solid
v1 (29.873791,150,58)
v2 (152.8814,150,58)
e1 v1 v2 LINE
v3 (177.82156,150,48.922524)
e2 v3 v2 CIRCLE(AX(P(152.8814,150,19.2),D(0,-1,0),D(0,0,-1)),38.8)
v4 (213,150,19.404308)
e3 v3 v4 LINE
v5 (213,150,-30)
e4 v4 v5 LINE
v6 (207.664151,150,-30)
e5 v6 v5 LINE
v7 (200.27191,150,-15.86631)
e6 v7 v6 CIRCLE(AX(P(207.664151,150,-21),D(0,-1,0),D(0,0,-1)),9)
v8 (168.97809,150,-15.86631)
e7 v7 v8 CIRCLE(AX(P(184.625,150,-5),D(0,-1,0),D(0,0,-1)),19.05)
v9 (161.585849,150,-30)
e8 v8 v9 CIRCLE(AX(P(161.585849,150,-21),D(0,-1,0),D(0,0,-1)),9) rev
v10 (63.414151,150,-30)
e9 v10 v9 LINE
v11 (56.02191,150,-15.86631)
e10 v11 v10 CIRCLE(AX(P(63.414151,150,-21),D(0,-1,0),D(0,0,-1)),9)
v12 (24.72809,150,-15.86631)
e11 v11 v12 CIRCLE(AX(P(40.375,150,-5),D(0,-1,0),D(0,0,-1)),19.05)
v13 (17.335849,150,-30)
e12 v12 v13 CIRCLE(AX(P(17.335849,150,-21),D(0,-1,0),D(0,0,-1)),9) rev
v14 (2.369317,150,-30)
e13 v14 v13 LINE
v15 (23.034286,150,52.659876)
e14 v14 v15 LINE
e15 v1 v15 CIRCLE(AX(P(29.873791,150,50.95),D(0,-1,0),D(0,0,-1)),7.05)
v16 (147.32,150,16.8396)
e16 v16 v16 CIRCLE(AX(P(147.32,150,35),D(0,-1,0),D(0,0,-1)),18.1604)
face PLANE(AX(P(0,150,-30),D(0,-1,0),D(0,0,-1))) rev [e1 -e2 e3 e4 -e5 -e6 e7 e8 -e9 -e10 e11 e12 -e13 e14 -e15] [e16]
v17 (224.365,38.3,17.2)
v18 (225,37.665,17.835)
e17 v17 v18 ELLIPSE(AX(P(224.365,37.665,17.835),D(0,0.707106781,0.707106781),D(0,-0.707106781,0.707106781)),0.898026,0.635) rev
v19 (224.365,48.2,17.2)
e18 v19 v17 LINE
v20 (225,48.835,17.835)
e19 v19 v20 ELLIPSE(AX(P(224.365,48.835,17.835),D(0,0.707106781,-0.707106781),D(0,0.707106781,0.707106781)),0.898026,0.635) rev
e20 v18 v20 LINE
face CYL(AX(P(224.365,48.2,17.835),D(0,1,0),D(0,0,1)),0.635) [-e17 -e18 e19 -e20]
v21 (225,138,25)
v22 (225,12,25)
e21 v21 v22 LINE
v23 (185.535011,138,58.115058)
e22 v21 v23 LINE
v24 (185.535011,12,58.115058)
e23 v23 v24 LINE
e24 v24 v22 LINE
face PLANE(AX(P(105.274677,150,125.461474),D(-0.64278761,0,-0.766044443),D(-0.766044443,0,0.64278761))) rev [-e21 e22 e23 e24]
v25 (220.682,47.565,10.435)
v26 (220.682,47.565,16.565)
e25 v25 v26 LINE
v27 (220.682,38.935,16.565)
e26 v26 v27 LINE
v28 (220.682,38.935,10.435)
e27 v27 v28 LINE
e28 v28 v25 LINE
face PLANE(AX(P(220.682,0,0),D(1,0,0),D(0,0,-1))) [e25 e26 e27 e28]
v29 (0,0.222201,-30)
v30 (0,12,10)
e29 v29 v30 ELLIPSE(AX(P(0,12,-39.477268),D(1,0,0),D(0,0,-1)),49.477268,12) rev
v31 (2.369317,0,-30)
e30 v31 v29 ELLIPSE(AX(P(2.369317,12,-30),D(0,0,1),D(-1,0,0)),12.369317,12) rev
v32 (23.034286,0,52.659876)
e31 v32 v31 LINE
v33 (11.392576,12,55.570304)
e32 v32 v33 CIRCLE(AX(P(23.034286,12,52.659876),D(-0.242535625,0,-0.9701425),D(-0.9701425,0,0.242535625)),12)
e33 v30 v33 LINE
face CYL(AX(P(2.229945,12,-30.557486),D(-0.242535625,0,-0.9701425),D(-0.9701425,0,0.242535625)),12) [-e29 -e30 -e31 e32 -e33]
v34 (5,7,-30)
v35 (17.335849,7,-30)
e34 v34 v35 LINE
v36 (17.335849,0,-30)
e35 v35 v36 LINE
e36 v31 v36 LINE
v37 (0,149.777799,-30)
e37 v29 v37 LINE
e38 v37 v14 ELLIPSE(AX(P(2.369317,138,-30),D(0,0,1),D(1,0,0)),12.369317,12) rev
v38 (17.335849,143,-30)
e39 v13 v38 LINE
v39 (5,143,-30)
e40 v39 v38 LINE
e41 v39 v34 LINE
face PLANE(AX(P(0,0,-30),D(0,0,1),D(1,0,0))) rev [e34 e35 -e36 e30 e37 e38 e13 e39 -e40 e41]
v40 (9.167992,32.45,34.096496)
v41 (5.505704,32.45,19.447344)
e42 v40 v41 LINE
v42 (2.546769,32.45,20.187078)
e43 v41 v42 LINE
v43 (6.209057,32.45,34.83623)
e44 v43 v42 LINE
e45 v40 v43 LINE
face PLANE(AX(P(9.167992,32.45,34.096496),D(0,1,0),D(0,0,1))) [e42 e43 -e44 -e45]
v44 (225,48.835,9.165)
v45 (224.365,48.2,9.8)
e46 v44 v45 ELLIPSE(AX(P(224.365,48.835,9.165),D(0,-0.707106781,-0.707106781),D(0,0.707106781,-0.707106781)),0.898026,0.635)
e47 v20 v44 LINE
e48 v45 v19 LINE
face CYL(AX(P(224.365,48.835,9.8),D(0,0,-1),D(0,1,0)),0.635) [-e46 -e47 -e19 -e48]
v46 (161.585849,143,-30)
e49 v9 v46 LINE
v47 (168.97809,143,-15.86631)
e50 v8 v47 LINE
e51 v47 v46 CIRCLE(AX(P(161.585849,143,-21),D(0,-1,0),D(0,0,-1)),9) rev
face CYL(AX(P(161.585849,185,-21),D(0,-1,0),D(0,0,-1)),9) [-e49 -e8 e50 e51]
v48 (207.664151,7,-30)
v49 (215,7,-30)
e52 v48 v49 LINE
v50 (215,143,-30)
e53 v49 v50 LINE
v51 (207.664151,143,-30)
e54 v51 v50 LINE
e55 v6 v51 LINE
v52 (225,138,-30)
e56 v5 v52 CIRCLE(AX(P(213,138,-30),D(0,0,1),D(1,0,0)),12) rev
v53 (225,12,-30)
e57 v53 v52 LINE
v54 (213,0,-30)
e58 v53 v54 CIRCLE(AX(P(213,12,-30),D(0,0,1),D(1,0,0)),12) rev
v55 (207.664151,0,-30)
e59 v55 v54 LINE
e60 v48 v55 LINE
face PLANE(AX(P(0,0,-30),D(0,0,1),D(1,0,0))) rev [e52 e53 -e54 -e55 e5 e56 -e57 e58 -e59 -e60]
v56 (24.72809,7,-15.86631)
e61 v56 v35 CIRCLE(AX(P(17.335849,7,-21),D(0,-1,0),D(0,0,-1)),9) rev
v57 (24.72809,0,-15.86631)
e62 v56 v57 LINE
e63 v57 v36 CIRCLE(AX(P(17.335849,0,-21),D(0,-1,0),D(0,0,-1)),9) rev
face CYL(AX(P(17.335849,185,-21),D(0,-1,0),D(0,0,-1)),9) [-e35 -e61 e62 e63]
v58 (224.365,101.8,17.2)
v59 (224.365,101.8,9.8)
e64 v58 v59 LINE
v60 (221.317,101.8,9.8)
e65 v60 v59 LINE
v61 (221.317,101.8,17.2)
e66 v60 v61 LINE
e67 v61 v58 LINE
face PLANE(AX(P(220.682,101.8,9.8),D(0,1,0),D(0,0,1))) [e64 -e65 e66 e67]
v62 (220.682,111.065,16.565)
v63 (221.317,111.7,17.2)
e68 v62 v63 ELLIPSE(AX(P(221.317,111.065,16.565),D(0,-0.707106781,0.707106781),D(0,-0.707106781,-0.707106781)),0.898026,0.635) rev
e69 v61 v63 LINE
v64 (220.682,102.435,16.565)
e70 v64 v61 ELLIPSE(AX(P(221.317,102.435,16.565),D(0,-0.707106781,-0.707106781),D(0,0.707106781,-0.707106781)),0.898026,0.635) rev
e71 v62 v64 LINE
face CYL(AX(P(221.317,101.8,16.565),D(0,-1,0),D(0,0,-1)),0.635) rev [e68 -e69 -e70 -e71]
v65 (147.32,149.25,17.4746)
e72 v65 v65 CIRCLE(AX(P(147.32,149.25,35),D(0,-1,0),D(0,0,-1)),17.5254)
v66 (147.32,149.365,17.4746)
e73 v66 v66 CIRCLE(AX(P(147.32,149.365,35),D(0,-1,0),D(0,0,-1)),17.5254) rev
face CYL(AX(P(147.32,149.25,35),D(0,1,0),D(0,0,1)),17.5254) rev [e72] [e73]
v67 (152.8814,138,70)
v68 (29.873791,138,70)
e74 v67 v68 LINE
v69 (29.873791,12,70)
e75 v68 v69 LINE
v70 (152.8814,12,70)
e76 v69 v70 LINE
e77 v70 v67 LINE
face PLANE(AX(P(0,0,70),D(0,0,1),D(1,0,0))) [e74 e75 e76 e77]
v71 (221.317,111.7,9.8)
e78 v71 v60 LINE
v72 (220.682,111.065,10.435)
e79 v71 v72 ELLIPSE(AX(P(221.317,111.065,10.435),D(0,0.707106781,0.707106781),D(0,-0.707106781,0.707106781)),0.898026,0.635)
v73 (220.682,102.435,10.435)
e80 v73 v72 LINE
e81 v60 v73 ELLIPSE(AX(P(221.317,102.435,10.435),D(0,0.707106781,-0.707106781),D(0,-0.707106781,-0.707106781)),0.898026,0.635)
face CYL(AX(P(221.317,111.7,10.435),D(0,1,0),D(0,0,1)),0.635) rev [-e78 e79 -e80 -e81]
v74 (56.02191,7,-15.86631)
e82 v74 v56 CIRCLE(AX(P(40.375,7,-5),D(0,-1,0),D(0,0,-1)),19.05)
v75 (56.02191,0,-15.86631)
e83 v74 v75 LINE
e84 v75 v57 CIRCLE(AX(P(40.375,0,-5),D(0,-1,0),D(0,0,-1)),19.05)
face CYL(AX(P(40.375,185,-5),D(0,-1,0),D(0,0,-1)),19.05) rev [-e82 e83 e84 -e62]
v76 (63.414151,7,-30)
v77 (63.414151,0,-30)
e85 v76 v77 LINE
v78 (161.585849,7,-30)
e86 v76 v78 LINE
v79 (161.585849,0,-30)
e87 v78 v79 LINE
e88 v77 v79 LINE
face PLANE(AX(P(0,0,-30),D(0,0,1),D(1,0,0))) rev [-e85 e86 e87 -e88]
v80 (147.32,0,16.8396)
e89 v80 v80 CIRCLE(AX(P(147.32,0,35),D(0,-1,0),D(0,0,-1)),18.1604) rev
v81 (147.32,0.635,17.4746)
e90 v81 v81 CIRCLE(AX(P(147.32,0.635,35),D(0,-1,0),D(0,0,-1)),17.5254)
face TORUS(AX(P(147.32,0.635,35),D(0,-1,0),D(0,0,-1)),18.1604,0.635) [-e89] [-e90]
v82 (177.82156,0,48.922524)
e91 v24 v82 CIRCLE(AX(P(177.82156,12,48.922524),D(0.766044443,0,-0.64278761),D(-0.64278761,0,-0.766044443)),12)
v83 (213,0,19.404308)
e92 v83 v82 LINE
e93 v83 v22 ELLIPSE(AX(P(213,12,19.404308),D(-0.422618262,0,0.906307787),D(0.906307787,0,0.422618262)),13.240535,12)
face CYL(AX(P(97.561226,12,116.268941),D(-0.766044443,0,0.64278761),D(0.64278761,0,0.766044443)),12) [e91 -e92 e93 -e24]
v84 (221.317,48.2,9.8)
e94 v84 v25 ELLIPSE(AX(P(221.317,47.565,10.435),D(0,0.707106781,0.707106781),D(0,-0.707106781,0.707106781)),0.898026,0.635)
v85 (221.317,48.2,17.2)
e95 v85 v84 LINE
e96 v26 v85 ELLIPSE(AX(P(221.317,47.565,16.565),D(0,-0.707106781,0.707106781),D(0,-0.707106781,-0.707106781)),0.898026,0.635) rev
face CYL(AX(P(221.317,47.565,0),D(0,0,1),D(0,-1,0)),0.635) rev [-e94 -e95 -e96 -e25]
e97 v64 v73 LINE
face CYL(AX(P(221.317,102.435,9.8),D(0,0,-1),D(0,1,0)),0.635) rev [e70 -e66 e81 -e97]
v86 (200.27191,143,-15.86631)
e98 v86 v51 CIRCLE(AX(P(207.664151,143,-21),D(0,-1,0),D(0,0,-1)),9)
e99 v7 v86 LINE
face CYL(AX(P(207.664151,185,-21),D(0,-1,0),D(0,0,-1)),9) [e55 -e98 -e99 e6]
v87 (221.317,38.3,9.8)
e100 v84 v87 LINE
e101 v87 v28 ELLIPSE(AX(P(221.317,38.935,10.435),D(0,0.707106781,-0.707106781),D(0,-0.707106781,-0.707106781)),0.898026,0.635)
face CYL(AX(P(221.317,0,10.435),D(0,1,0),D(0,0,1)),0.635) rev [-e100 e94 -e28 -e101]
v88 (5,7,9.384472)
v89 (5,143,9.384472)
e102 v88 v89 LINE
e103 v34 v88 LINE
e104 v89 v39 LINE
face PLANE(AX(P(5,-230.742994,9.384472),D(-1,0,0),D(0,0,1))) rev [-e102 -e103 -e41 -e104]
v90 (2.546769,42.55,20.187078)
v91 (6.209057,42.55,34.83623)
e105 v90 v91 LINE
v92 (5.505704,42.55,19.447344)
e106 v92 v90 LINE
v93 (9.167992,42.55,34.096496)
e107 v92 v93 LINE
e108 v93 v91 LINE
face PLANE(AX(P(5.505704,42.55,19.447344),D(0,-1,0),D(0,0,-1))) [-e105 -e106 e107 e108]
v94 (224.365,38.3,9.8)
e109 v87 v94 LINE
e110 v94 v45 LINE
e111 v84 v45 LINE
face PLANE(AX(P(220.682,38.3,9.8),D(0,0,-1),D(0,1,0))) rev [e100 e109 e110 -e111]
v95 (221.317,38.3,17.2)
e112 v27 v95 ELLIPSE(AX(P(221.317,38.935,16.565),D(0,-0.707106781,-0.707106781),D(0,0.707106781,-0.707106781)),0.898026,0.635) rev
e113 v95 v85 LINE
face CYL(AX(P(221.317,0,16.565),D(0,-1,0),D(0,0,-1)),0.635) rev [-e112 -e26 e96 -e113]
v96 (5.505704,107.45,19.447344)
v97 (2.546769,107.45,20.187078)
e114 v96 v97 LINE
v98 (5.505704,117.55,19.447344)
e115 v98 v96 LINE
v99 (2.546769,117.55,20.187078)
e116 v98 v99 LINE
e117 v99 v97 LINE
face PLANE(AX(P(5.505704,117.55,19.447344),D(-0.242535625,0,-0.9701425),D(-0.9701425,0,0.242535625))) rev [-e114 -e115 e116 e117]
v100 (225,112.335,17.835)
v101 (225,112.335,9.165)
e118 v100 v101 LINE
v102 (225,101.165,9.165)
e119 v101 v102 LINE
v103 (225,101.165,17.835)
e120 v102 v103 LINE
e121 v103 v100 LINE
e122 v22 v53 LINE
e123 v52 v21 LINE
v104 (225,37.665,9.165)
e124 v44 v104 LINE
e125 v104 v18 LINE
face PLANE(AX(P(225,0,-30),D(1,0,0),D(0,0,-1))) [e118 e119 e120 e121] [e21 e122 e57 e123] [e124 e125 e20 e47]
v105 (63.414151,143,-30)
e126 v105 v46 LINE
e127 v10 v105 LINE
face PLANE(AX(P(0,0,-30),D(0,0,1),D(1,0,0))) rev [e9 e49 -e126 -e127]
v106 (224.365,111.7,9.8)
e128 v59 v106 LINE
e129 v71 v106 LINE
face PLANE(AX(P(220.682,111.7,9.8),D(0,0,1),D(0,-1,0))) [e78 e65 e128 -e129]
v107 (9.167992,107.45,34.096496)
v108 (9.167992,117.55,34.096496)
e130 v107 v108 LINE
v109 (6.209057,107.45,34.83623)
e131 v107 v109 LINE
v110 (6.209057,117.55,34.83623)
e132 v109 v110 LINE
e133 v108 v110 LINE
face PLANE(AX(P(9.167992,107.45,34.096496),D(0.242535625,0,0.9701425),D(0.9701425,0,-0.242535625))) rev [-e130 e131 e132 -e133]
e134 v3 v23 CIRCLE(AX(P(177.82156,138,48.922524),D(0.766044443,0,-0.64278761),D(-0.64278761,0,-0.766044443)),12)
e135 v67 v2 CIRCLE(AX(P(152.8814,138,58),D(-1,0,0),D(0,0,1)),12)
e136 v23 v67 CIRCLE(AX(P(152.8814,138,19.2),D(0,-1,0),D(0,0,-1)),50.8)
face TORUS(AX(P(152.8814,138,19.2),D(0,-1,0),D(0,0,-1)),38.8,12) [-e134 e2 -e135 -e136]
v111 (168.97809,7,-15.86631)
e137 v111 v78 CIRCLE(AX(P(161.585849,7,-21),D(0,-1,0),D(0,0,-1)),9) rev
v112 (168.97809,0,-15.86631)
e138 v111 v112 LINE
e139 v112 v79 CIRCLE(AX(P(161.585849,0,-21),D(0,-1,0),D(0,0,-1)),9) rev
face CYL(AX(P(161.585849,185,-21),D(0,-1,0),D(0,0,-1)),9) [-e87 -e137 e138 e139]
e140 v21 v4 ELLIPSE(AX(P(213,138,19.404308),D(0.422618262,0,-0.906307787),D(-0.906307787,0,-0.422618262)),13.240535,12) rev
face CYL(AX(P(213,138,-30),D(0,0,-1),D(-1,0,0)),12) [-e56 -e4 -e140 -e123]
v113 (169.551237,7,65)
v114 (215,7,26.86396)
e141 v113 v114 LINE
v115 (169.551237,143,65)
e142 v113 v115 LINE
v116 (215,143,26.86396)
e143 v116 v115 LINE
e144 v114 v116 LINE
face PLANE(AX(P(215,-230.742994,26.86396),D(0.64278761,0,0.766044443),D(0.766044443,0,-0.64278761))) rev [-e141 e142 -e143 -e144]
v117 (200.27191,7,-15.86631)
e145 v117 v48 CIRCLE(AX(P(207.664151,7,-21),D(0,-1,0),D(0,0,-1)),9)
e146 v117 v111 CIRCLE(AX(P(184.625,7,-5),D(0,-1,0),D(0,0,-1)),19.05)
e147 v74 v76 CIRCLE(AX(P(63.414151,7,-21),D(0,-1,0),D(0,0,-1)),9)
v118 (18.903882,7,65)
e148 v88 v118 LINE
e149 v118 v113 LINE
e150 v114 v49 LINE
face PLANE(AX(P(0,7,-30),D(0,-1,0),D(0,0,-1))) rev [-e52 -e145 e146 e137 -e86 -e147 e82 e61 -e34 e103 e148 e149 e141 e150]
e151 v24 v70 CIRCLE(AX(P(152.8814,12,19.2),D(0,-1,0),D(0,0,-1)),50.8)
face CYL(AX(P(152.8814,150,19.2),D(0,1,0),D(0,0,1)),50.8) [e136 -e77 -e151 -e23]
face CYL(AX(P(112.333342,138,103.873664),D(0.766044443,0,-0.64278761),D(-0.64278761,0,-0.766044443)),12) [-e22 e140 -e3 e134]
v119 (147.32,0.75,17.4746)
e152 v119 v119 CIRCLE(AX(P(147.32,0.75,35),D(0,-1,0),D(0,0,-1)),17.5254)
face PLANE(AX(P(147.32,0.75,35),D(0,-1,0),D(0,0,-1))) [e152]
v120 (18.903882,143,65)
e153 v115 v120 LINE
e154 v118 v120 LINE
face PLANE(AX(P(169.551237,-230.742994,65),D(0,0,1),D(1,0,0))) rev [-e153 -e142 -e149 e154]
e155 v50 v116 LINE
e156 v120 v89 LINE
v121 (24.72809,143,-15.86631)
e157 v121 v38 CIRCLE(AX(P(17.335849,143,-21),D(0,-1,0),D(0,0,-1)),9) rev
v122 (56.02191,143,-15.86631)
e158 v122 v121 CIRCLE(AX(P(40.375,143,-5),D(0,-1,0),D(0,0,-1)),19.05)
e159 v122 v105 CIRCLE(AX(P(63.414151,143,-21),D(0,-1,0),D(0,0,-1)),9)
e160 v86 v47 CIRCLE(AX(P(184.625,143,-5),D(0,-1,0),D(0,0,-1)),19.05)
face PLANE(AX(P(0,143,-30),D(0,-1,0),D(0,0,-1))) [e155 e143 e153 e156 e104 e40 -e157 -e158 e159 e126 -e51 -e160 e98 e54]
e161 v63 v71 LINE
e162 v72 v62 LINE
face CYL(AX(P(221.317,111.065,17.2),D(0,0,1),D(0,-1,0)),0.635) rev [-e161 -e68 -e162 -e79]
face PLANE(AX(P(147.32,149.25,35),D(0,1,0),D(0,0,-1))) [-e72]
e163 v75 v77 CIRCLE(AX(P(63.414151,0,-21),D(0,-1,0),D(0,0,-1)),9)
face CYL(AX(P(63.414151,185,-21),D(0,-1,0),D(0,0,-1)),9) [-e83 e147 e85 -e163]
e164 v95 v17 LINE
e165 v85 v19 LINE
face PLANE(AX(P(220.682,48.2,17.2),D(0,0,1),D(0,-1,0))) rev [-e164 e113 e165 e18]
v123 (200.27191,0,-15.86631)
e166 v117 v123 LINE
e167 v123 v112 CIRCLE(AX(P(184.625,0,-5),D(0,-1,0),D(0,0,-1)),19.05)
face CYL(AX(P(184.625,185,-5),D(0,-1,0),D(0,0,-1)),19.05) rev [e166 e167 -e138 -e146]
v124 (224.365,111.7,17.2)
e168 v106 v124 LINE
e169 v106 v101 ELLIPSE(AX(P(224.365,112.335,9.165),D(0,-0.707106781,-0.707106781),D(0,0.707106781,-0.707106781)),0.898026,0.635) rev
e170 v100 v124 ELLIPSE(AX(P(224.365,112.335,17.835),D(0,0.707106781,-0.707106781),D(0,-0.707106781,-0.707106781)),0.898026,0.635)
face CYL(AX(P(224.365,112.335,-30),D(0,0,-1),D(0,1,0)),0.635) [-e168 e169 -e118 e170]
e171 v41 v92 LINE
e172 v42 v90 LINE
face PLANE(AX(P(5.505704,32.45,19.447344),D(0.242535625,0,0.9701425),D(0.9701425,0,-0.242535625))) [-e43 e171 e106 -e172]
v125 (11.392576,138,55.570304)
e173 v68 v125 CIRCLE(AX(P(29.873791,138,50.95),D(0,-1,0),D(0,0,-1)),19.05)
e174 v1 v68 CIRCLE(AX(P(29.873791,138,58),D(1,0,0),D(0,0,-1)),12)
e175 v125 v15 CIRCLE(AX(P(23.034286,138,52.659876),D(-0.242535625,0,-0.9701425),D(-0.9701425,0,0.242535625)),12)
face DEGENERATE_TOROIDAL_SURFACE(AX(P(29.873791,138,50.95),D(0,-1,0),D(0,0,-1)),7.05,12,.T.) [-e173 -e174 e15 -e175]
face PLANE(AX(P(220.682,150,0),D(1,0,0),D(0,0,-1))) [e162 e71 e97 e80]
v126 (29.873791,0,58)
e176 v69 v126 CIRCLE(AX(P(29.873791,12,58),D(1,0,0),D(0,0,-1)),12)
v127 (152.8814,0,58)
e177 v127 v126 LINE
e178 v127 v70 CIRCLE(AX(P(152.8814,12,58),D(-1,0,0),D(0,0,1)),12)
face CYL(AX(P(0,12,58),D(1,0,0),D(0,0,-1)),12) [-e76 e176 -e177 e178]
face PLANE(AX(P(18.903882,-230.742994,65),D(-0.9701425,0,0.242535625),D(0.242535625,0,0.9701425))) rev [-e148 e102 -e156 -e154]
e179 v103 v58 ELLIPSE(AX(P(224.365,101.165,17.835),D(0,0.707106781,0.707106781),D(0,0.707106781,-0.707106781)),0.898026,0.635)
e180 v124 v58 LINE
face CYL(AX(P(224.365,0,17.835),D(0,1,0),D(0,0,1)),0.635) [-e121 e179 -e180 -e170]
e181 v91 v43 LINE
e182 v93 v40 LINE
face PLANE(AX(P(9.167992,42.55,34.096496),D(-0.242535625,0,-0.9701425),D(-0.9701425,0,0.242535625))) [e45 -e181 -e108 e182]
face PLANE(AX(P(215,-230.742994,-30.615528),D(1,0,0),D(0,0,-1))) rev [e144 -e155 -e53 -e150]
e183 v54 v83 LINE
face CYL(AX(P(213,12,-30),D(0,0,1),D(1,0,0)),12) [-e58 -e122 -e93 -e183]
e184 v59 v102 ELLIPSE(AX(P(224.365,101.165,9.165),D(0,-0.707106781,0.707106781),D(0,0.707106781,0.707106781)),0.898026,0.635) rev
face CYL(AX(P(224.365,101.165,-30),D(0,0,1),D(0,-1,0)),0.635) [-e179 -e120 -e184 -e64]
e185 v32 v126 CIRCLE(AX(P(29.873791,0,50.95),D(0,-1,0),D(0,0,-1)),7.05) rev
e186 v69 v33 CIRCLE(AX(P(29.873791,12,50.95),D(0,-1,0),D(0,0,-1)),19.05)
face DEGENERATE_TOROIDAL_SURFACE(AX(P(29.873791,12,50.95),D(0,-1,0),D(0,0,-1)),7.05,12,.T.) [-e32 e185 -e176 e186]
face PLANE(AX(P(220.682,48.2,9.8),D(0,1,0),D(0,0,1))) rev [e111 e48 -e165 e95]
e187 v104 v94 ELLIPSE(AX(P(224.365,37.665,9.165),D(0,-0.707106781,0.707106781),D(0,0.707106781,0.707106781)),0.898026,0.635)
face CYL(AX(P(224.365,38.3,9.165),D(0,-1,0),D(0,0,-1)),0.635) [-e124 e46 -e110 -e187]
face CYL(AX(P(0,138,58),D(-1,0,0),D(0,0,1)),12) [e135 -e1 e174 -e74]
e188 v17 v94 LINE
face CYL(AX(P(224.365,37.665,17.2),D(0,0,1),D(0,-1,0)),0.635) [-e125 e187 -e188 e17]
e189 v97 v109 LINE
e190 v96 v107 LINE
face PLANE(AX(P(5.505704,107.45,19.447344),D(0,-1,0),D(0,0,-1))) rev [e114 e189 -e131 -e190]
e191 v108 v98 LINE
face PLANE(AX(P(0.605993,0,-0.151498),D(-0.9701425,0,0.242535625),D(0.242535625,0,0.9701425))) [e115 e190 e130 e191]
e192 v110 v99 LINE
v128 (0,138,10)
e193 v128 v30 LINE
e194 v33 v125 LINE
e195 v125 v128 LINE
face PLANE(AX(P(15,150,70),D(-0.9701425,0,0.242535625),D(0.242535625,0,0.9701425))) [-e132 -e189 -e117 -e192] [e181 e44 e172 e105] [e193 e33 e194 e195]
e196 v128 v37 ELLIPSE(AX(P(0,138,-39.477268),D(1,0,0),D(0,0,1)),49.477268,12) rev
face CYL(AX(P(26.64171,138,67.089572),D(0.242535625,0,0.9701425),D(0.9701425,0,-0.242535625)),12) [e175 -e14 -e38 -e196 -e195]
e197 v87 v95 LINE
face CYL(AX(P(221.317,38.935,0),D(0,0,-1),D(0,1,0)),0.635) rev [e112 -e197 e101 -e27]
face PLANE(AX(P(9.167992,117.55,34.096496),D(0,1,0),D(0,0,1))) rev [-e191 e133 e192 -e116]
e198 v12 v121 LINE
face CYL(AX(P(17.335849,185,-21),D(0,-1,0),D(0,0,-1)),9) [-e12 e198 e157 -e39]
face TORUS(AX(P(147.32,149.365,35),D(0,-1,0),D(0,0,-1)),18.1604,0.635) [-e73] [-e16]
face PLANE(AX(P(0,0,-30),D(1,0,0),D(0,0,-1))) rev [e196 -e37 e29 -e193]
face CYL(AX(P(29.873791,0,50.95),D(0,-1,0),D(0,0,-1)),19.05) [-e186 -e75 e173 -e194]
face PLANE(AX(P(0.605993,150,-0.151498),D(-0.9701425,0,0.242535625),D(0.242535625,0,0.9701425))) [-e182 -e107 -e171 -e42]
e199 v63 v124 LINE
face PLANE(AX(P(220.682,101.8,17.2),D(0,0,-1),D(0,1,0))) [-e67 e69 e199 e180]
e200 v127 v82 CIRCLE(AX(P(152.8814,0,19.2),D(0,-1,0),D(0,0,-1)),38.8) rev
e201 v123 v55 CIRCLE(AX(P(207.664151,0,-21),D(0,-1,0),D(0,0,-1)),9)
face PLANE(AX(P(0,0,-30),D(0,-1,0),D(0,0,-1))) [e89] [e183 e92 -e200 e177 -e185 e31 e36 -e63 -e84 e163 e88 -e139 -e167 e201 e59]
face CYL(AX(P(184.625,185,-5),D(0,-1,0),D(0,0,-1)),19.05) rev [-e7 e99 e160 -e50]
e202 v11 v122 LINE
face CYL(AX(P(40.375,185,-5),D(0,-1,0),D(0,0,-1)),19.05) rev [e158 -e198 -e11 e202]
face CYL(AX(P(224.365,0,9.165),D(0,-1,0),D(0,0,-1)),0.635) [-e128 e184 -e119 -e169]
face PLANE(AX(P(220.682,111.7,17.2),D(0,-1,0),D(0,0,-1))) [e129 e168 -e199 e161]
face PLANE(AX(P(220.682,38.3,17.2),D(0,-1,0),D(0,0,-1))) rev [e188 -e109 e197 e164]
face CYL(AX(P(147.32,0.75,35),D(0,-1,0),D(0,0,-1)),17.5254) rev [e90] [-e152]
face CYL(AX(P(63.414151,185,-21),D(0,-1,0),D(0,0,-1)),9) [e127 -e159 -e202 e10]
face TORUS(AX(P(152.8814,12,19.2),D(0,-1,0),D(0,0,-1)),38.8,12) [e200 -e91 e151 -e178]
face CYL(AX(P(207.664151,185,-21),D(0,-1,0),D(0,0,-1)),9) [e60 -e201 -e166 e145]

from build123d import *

# Parameters (mm, degrees)
BOSS_EXTRUDE1_DEPTH      = 70
BOSS_EXTRUDE1_DEPTH_BACK = 30
SKETCH1_W                = 225
SKETCH1_H                = 150
CUT_EXTRUDE1_DEPTH       = 280.329554469
CUT_EXTRUDE2_DEPTH       = 68
CUT_EXTRUDE2_DEPTH_BACK  = 68
SKETCH8_R                = 19.05
CUT_EXTRUDE3_DEPTH       = 185
FILLET1_R                = 12
FILLET2_R                = 50.8
FILLET3_R                = 19.05
SKETCH13_W               = 7.4
SKETCH13_H               = 9.9
CUT_EXTRUDE4_DEPTH       = 4.318
FILLET4_R                = 0.635
FILLET4_OF_MIRROR2_R     = 0.635
SKETCH14_R               = 17.5254
CUT_EXTRUDE5_DEPTH       = 0.75
FILLET5_R                = 0.635
FILLET6_R                = 0.635
SKETCH16_W               = 15.1
SKETCH16_H               = 10.1
CUT_EXTRUDE6_DEPTH       = 3.05


with BuildPart() as part:
    # Sketch1 → Boss-Extrude1 (new, two sides: drawn at the far end of the back side and taken through both)
    with BuildSketch(Plane.XY.offset(-BOSS_EXTRUDE1_DEPTH_BACK)):
        with Locations((112.5, 75)):
            Rectangle(SKETCH1_W, SKETCH1_H)
    extrude(amount=BOSS_EXTRUDE1_DEPTH + BOSS_EXTRUDE1_DEPTH_BACK)

    # Sketch2 → Cut-Extrude1 (cut, through all)
    with BuildSketch(Plane.XZ):
        Polygon((225, 70), (171.371088333, 70), (225, 25), align=None)
        Polygon((0, 70), (15, 70), (0, 10), align=None)
    extrude(amount=-CUT_EXTRUDE1_DEPTH, mode=Mode.SUBTRACT)

    # Sketch7 → Cut-Extrude2 (cut, two sides: drawn at the far end of the back side and taken through both)
    with BuildSketch(Plane(origin=(0, 75, 0), x_dir=(1, 0, 0), z_dir=(0, 1, 0)).offset(-CUT_EXTRUDE2_DEPTH_BACK)):
        Polygon((215, 30.615528128), (215, -26.863959865), (169.551237162, -65), (18.903882032, -65), (5, -9.384471872), (5, 30.615528128), align=None)
    extrude(amount=CUT_EXTRUDE2_DEPTH + CUT_EXTRUDE2_DEPTH_BACK, mode=Mode.SUBTRACT)

    # Sketch8 → Cut-Extrude3 (cut)
    with BuildSketch(Plane.XZ):
        with Locations((40.375, -5)):
            Circle(SKETCH8_R)
        with BuildLine():
            Line((17.33584854, -30), (63.41415146, -30))
            ThreePointArc((63.41415146, -30), (55.439090064, -25.17113842), (56.02191035, -15.86631016))
            ThreePointArc((56.02191035, -15.86631016), (40.375, -24.05), (24.72808965, -15.86631016))
            ThreePointArc((24.72808965, -15.86631016), (25.310909936, -25.17113842), (17.33584854, -30))
        make_face()
        with Locations((184.625, -5)):
            Circle(SKETCH8_R)
        with BuildLine():
            ThreePointArc((200.27191035, -15.86631016), (184.625, -24.05), (168.97808965, -15.86631016))
            ThreePointArc((168.97808965, -15.86631016), (169.560909936, -25.17113842), (161.58584854, -30))
            Line((161.58584854, -30), (207.66415146, -30))
            ThreePointArc((207.66415146, -30), (199.689090064, -25.17113842), (200.27191035, -15.86631016))
        make_face()
    extrude(amount=-CUT_EXTRUDE3_DEPTH, mode=Mode.SUBTRACT)

    # Fillet1
    fillet1_edges = [part.edges().sort_by_distance(p)[0] for p in [
        (198.185544167, 0, 47.5),
        (225, 0, -2.5),
        (7.5, 0, 40),
        (93.185544167, 0, 70),
        (7.5, 150, 40),
        (93.185544167, 150, 70),
        (198.185544167, 150, 47.5),
        (225, 150, -2.5),
    ]]
    fillet(fillet1_edges, radius=FILLET1_R)

    # Fillet2
    # the kernel refuses this fillet: 50.8 mm, written as the material it takes off along each edge
    with BuildSketch(Plane(origin=(152.881400433, 150, 19.2), x_dir=(0, 0, 1), z_dir=(-1, 0, 0))) as fillet2_piece_1:
        with BuildLine():
            CenterArc((38.8, -12), 12, 0, 90)
            Line((50.8, -12), (50.8, 0))
            Line((50.8, 0), (38.8, 0))
        make_face()
    revolve(axis=Axis((152.881400433, 150, 19.2), (0, 1, 0)), revolution_arc=40, mode=Mode.SUBTRACT)
    with BuildSketch(Plane(origin=(152.881400433, 0, 19.2), x_dir=(0.6427876096865435, 0, 0.7660444431189747), z_dir=(0.7660444431189747, 0, -0.6427876096865435))) as fillet2_piece_2:
        with BuildLine():
            CenterArc((38.8, -12), 12, 0, 90)
            Line((50.8, -12), (50.8, 0))
            Line((50.8, 0), (38.8, 0))
        make_face()
    revolve(axis=Axis((152.881400433, 0, 19.2), (0, -1, 0)), revolution_arc=40, mode=Mode.SUBTRACT)
    with BuildSketch(Plane(origin=(171.371088333, 0, 70), x_dir=(-1, 0, 0), z_dir=(0, 1, 0))) as fillet2_piece_3:
        with BuildLine():
            CenterArc((FILLET2_R * 0.363970234266, -FILLET2_R), FILLET2_R, 90, 40)
            Line((-FILLET2_R * 0.27881737542, -FILLET2_R * 0.233955556881), (0, 0))
            Line((0, 0), (FILLET2_R * 0.363970234266, 0))
        make_face()
    extrude(amount=150, mode=Mode.SUBTRACT)

    # Fillet3
    # the kernel refuses this fillet: 19.05 mm, written as the material it takes off along each edge
    with BuildSketch(Plane(origin=(29.873790542, 150, 50.95), x_dir=(-0.9701425001453319, 0, 0.24253562503633305), z_dir=(-0.24253562503633305, 0, -0.9701425001453319))) as fillet3_piece_1:
        with BuildLine():
            CenterArc((7.05, -12), 12, 0, 90)
            Line((19.05, -12), (19.05, 0))
            Line((19.05, 0), (7.05, 0))
        make_face()
    fillet3_piece_1_solid = revolve(axis=Axis((29.873790542, 150, 50.95), (0, 1, 0)), revolution_arc=75.963756532, mode=Mode.PRIVATE)
    with BuildSketch(Plane(origin=(29.873790542, 0, 50.95), x_dir=(0, 0, 1), z_dir=(1, 0, 0))) as fillet3_piece_2:
        with BuildLine():
            CenterArc((7.05, -12), 12, 0, 90)
            Line((19.05, -12), (19.05, 0))
            Line((19.05, 0), (7.05, 0))
        make_face()
    fillet3_piece_2_solid = revolve(axis=Axis((29.873790542, 0, 50.95), (0, -1, 0)), revolution_arc=75.963756532, mode=Mode.PRIVATE)
    with BuildSketch(Plane(origin=(15, 0, 70), x_dir=(1, 0, 0), z_dir=(0, 1, 0))) as fillet3_piece_3:
        with BuildLine():
            CenterArc((FILLET3_R * 0.780776406404, FILLET3_R), FILLET3_R, 194.036243468, 75.963756532)
            Line((-FILLET3_R * 0.189366093741, FILLET3_R * 0.757464374964), (0, 0))
            Line((0, 0), (FILLET3_R * 0.780776406404, 0))
        make_face()
    fillet3_piece_3_solid = extrude(amount=150, mode=Mode.PRIVATE)
    add([fillet3_piece_1_solid, fillet3_piece_2_solid, fillet3_piece_3_solid], mode=Mode.SUBTRACT)

    # Sketch13 → Cut-Extrude4 (cut)
    with BuildSketch(Plane(origin=(225, 0, 0), x_dir=(0, 0, -1), z_dir=(1, 0, 0))):
        with Locations((-13.5, 43.25)):
            Rectangle(SKETCH13_W, SKETCH13_H)
    cut_extrude4 = extrude(amount=-CUT_EXTRUDE4_DEPTH, mode=Mode.SUBTRACT)

    # Fillet4
    fillet4_edges = [part.edges().sort_by_distance(p)[0] for p in [
        (220.682, 43.25, 9.8),
        (220.682, 38.3, 13.5),
        (220.682, 43.25, 17.2),
        (220.682, 48.2, 13.5),
        (225, 43.25, 9.8),
        (225, 48.2, 13.5),
        (225, 43.25, 17.2),
        (225, 38.3, 13.5),
    ]]
    fillet(fillet4_edges, radius=FILLET4_R)

    # Mirror2: Cut-Extrude4 across plane
    add(cut_extrude4.mirror(Plane.ZX.offset(75)), mode=Mode.SUBTRACT)

    # Fillet4 of Mirror2
    fillet4_of_mirror2_edges = [part.edges().sort_by_distance(p)[0] for p in [
        (220.682, 106.75, 9.8),
        (220.682, 111.7, 13.5),
        (220.682, 106.75, 17.2),
        (220.682, 101.8, 13.5),
        (225, 106.75, 9.8),
        (225, 101.8, 13.5),
        (225, 106.75, 17.2),
        (225, 111.7, 13.5),
    ]]
    fillet(fillet4_of_mirror2_edges, radius=FILLET4_OF_MIRROR2_R)

    # Sketch14 → Cut-Extrude5 (cut)
    with BuildSketch(Plane.XZ):
        with Locations(Location((147.32, 35, 0), (0, 0, 270))):
            Circle(SKETCH14_R)
    cut_extrude5 = extrude(amount=-CUT_EXTRUDE5_DEPTH, mode=Mode.SUBTRACT)

    # Fillet5
    fillet5_edges = [part.edges().sort_by_distance(p)[0] for p in [
        (147.32, 0, 52.5254),
    ]]
    fillet(fillet5_edges, radius=FILLET5_R)

    # Mirror4: Cut-Extrude5 across plane
    add(cut_extrude5.mirror(Plane.ZX.offset(75)), mode=Mode.SUBTRACT)

    # Fillet6
    fillet6_edges = [part.edges().sort_by_distance(p)[0] for p in [
        (147.32, 150, 52.5254),
    ]]
    fillet(fillet6_edges, radius=FILLET6_R)

    # Sketch16 → Cut-Extrude6 (cut)
    with BuildSketch(Plane(origin=(-2.352941176, 0, 0.588235294), x_dir=(0.24253562503633294, 0, 0.9701425001453319), z_dir=(-0.9701425001453319, 0, 0.24253562503633294))):
        with Locations((27.752024594, 112.5)):
            Rectangle(SKETCH16_W, SKETCH16_H)
    cut_extrude6 = extrude(amount=-CUT_EXTRUDE6_DEPTH, mode=Mode.SUBTRACT)

    # Mirror5: Cut-Extrude6 across plane
    add(cut_extrude6.mirror(Plane.ZX.offset(75)), mode=Mode.SUBTRACT)


solid = part.part
